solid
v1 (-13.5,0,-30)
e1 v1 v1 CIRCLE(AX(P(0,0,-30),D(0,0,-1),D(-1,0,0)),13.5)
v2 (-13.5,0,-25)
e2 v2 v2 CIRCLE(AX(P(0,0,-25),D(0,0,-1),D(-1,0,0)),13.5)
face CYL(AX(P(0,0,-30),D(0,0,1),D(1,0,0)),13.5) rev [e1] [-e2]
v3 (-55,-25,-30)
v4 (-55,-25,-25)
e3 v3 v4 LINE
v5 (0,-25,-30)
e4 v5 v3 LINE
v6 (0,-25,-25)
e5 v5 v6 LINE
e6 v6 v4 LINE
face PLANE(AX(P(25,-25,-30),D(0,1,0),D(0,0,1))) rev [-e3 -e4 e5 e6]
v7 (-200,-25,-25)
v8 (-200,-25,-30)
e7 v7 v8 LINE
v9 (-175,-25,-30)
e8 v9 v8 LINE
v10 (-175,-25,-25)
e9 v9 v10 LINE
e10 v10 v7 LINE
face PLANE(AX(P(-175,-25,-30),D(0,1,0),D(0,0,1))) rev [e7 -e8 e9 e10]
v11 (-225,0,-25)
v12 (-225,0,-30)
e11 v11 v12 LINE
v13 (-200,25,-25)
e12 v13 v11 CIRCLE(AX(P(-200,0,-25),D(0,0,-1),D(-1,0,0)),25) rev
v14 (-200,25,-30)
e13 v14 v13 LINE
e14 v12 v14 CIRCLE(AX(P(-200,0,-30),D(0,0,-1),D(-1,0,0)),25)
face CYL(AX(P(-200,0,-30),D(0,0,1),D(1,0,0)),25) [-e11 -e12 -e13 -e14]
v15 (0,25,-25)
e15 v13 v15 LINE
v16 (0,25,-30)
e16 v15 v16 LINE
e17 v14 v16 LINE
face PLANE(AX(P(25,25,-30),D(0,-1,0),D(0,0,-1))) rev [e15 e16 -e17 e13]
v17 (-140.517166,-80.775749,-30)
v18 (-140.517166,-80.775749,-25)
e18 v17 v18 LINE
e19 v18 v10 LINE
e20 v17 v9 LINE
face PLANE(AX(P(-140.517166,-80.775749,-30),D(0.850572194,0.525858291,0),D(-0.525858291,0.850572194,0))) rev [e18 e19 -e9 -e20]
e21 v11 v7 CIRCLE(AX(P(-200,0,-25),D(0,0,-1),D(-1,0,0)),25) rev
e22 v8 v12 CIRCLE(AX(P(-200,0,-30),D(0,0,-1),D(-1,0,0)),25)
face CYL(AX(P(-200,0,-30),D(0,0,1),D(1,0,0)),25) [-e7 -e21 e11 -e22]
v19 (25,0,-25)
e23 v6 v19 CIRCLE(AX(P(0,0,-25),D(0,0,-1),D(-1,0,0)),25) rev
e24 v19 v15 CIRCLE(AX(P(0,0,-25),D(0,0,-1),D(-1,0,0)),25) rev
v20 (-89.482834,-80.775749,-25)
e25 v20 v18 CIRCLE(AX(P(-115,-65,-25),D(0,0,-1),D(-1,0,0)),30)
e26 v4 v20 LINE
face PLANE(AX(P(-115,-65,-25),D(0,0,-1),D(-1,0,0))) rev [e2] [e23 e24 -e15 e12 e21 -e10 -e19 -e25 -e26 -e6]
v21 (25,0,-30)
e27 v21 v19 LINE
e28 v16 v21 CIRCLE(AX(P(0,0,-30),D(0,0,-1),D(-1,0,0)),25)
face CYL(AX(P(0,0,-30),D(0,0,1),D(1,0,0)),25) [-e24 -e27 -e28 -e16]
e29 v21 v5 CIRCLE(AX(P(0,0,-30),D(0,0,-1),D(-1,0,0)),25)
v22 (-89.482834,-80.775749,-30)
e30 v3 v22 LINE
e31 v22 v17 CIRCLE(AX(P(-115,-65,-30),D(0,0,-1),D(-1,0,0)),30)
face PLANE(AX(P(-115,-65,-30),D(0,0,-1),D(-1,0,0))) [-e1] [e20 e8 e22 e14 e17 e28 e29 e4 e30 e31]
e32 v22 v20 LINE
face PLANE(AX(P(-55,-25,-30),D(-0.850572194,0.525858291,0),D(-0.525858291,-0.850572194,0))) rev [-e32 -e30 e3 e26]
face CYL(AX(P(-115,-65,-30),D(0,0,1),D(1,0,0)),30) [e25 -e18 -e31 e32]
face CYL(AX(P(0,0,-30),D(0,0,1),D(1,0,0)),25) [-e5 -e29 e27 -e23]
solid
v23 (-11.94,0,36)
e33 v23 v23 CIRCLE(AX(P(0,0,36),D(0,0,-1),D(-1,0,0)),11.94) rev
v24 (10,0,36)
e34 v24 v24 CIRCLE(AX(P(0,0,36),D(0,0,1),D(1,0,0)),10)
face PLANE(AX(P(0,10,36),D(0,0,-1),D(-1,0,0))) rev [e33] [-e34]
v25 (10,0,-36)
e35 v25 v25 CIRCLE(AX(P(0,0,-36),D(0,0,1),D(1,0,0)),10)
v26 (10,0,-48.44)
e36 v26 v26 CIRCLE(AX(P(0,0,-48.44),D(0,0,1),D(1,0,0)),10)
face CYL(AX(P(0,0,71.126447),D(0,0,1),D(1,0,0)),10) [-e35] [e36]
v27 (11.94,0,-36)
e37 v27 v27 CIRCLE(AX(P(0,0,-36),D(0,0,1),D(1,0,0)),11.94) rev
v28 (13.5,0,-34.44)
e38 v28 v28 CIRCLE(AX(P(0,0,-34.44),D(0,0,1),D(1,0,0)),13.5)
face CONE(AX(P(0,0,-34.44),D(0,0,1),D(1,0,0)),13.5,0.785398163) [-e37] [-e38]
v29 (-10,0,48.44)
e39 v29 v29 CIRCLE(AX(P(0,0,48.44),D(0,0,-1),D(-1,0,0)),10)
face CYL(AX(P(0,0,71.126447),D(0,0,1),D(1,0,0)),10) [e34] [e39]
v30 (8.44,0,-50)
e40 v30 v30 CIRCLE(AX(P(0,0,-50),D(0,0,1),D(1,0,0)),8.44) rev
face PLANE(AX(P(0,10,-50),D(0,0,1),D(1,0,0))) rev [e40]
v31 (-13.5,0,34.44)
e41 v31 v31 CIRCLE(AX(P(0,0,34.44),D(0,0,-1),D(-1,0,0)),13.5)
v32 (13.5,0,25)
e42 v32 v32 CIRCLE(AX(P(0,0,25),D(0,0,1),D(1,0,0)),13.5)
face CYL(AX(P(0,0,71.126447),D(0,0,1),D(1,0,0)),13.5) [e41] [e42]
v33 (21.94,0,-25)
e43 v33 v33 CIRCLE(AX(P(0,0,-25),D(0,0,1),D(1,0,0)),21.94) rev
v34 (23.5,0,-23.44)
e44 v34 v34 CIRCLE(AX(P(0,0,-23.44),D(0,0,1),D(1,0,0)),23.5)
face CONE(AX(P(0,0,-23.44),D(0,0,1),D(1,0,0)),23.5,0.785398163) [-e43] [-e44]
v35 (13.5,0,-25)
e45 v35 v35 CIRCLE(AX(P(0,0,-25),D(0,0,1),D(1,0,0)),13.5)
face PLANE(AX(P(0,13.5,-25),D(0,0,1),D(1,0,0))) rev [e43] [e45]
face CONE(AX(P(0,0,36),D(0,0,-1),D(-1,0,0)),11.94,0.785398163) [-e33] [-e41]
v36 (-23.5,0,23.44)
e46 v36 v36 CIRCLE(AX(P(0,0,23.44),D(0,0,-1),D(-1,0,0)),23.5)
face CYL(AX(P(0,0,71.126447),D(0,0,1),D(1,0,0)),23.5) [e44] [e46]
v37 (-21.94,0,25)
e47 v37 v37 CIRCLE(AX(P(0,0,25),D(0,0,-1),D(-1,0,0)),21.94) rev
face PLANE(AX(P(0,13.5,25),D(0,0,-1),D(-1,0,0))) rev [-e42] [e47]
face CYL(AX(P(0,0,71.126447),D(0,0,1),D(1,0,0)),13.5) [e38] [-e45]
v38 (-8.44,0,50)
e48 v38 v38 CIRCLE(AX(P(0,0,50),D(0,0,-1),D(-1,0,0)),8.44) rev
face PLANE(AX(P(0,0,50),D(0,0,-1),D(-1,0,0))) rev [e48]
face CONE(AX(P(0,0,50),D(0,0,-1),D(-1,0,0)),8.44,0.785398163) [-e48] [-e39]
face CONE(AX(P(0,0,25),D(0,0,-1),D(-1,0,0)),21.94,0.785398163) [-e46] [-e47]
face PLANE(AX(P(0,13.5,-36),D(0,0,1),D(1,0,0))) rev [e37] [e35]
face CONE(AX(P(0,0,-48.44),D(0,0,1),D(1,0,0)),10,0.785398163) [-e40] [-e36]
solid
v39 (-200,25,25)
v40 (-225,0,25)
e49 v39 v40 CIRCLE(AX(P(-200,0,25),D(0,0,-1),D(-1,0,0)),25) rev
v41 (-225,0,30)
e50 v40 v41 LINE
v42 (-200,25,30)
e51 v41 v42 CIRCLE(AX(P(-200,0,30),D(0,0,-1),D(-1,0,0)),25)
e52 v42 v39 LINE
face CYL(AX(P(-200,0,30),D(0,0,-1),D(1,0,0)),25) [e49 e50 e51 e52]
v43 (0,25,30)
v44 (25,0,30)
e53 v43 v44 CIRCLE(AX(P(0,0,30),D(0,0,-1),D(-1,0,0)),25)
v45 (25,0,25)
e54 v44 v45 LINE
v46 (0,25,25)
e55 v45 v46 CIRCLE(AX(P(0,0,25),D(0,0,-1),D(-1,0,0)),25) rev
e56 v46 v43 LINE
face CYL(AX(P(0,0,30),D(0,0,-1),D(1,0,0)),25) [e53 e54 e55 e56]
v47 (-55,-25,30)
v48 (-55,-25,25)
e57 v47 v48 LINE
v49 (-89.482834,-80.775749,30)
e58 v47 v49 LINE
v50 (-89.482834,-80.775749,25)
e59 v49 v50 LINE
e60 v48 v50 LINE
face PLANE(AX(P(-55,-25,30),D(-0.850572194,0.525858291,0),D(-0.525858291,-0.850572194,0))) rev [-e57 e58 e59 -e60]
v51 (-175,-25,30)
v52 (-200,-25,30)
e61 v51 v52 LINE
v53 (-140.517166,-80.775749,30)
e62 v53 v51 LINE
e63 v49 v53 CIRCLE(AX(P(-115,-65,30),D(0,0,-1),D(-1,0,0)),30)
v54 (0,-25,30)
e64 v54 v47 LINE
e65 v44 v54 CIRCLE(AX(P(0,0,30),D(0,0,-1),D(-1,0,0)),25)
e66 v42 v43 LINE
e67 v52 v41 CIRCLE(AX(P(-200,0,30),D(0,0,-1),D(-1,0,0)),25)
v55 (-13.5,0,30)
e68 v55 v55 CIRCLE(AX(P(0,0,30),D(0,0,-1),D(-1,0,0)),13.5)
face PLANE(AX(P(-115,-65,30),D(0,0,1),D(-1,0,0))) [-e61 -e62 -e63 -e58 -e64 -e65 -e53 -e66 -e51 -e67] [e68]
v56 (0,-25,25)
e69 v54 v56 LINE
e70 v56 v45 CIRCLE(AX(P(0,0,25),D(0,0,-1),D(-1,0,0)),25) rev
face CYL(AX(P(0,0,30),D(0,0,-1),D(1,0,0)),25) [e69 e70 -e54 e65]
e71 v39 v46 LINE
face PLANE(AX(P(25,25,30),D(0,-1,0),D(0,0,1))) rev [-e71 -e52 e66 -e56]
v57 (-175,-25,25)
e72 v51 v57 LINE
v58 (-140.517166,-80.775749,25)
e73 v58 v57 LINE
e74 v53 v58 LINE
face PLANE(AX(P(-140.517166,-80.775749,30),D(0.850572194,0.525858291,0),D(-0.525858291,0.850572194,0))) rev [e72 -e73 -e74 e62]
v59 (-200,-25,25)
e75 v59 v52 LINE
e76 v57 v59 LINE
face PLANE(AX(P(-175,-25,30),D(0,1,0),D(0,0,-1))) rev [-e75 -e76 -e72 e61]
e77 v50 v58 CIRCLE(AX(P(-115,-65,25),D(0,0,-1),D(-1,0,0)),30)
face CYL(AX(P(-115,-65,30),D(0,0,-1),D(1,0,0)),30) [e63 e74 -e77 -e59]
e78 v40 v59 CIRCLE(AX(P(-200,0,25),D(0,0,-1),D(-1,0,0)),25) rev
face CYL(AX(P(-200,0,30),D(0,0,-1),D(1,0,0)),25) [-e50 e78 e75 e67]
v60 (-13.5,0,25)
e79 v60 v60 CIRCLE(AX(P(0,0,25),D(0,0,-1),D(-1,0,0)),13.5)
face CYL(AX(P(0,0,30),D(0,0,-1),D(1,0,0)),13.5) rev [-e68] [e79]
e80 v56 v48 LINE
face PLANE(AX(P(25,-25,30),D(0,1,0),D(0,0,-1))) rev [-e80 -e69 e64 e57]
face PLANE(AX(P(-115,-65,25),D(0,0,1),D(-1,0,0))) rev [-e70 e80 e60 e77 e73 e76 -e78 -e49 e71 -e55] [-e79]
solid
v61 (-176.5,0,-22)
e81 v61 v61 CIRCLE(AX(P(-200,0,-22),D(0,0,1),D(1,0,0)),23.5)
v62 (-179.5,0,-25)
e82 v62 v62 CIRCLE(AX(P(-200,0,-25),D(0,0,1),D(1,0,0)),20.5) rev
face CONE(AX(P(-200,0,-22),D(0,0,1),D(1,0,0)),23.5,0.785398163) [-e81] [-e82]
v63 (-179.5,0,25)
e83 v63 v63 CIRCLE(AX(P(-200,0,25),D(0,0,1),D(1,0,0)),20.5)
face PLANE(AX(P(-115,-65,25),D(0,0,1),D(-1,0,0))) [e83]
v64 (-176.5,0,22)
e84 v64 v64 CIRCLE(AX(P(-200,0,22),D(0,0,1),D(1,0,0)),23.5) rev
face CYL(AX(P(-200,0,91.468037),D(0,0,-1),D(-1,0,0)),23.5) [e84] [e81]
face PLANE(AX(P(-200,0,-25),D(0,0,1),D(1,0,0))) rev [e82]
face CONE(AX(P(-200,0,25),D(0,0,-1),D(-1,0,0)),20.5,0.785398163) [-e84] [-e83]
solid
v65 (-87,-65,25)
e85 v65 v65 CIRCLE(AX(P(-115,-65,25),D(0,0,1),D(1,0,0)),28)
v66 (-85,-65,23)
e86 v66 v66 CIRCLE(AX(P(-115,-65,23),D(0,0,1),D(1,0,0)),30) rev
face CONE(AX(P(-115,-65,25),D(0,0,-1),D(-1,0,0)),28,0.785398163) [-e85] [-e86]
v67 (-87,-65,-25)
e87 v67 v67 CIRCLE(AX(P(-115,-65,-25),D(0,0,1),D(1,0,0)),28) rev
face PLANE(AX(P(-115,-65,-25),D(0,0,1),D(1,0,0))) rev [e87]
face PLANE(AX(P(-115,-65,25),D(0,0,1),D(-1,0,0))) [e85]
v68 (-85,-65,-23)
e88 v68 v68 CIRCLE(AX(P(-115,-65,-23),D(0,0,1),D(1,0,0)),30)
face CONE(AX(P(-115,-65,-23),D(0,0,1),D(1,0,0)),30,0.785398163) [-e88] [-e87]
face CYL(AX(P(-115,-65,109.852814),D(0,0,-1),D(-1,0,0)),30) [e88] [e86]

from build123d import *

# Parameters (mm, degrees)
CHAMFER_1_SIZE  = 1.56
SKETCH_2_R      = 13.5
EXTRUDE_1_DEPTH = 5
FILLET_1_R      = 25
SKETCH_3_R      = 30
EXTRUDE_2_DEPTH = 50
SKETCH_4_R      = 23.5
EXTRUDE_3_DEPTH = 50
CHAMFER_2_SIZE  = 3
CHAMFER_3_SIZE  = 2


with BuildPart() as part:
    # Эскиз1 → Повернуть1 (revolve)
    with BuildSketch(Plane(origin=(0, 0, 0), x_dir=(0, 0, -1), z_dir=(1, 0, 0)), mode=Mode.PRIVATE) as revolve_1_sk:
        Polygon((-50, 0), (-50, 10), (-36, 10), (-36, 13.5), (-25, 13.5), (-25, 23.5), (25, 23.5), (25, 13.5), (36, 13.5), (36, 10), (50, 10), (50, 0), align=None)
    revolve(revolve_1_sk.sketch.rotate(Axis((0, 0, 71.126446899), (0, 0, -1)), 90), axis=Axis((0, 0, 71.126446899), (0, 0, -1)))

    # Фаска1
    chamfer_1_edges = [part.edges().sort_by_distance(p)[0] for p in [
        (-13.5, 0, -36),
        (-23.5, 0, -25),
        (-23.5, 0, 25),
        (-13.5, 0, 36),
        (-10, 0, 50),
        (-10, 0, -50),
    ]]
    chamfer(chamfer_1_edges, length=CHAMFER_1_SIZE)


with BuildPart() as body_2:
    # Эскиз2 → Бобышка-Вытянуть1 (new body)
    with BuildSketch(Plane(origin=(0, 0, -25), x_dir=(-1, 0, 0), z_dir=(0, 0, -1))):
        with BuildLine():
            Line((-25, -25), (-25, 25))
            Line((-25, 25), (225, 25))
            Line((225, 25), (225, -25))
            Line((225, -25), (175, -25))
            Line((175, -25), (140.517165825, -80.775748738))
            ThreePointArc((140.517165825, -80.775748738), (115, -95), (89.482834175, -80.775748738))
            Line((89.482834175, -80.775748738), (55, -25))
            Line((55, -25), (-25, -25))
        make_face()
        Circle(SKETCH_2_R, mode=Mode.SUBTRACT)
    extrude(amount=EXTRUDE_1_DEPTH)

    # Скругление1
    fillet_1_edges = [body_2.edges().sort_by_distance(p)[0] for p in [
        (25, -25, -27.5),
        (25, 25, -27.5),
        (-225, -25, -27.5),
        (-225, 25, -27.5),
    ]]
    fillet(fillet_1_edges, radius=FILLET_1_R - 0.0001)  # a hair under: the kernel refuses the full size


with BuildPart() as body_3:
    # Зеркальное отражение1: mirrored copy
    add(body_2.part.mirror(Plane.XY))


with BuildPart() as body_4:
    # Эскиз3 → Бобышка-Вытянуть2 (new body)
    with BuildSketch(Plane.XY.offset(-25)):
        with Locations((-115, -65)):
            Circle(SKETCH_3_R)
    extrude(amount=EXTRUDE_2_DEPTH)

    # Фаска3
    chamfer_3_edges = [body_4.edges().sort_by_distance(p)[0] for p in [
        (-145, -65, 25),
        (-145, -65, -25),
    ]]
    chamfer(chamfer_3_edges, length=CHAMFER_3_SIZE)


with BuildPart() as body_5:
    # Эскиз4 → Бобышка-Вытянуть3 (new body)
    with BuildSketch(Plane.XY.offset(-25)):
        with Locations((-200, 0)):
            Circle(SKETCH_4_R)
    extrude(amount=EXTRUDE_3_DEPTH)

    # Фаска2
    chamfer_2_edges = [body_5.edges().sort_by_distance(p)[0] for p in [
        (-223.5, 0, -25),
        (-223.5, 0, 25),
    ]]
    chamfer(chamfer_2_edges, length=CHAMFER_2_SIZE)


solid = Compound([part.part, body_2.part, body_3.part, body_4.part, body_5.part])
